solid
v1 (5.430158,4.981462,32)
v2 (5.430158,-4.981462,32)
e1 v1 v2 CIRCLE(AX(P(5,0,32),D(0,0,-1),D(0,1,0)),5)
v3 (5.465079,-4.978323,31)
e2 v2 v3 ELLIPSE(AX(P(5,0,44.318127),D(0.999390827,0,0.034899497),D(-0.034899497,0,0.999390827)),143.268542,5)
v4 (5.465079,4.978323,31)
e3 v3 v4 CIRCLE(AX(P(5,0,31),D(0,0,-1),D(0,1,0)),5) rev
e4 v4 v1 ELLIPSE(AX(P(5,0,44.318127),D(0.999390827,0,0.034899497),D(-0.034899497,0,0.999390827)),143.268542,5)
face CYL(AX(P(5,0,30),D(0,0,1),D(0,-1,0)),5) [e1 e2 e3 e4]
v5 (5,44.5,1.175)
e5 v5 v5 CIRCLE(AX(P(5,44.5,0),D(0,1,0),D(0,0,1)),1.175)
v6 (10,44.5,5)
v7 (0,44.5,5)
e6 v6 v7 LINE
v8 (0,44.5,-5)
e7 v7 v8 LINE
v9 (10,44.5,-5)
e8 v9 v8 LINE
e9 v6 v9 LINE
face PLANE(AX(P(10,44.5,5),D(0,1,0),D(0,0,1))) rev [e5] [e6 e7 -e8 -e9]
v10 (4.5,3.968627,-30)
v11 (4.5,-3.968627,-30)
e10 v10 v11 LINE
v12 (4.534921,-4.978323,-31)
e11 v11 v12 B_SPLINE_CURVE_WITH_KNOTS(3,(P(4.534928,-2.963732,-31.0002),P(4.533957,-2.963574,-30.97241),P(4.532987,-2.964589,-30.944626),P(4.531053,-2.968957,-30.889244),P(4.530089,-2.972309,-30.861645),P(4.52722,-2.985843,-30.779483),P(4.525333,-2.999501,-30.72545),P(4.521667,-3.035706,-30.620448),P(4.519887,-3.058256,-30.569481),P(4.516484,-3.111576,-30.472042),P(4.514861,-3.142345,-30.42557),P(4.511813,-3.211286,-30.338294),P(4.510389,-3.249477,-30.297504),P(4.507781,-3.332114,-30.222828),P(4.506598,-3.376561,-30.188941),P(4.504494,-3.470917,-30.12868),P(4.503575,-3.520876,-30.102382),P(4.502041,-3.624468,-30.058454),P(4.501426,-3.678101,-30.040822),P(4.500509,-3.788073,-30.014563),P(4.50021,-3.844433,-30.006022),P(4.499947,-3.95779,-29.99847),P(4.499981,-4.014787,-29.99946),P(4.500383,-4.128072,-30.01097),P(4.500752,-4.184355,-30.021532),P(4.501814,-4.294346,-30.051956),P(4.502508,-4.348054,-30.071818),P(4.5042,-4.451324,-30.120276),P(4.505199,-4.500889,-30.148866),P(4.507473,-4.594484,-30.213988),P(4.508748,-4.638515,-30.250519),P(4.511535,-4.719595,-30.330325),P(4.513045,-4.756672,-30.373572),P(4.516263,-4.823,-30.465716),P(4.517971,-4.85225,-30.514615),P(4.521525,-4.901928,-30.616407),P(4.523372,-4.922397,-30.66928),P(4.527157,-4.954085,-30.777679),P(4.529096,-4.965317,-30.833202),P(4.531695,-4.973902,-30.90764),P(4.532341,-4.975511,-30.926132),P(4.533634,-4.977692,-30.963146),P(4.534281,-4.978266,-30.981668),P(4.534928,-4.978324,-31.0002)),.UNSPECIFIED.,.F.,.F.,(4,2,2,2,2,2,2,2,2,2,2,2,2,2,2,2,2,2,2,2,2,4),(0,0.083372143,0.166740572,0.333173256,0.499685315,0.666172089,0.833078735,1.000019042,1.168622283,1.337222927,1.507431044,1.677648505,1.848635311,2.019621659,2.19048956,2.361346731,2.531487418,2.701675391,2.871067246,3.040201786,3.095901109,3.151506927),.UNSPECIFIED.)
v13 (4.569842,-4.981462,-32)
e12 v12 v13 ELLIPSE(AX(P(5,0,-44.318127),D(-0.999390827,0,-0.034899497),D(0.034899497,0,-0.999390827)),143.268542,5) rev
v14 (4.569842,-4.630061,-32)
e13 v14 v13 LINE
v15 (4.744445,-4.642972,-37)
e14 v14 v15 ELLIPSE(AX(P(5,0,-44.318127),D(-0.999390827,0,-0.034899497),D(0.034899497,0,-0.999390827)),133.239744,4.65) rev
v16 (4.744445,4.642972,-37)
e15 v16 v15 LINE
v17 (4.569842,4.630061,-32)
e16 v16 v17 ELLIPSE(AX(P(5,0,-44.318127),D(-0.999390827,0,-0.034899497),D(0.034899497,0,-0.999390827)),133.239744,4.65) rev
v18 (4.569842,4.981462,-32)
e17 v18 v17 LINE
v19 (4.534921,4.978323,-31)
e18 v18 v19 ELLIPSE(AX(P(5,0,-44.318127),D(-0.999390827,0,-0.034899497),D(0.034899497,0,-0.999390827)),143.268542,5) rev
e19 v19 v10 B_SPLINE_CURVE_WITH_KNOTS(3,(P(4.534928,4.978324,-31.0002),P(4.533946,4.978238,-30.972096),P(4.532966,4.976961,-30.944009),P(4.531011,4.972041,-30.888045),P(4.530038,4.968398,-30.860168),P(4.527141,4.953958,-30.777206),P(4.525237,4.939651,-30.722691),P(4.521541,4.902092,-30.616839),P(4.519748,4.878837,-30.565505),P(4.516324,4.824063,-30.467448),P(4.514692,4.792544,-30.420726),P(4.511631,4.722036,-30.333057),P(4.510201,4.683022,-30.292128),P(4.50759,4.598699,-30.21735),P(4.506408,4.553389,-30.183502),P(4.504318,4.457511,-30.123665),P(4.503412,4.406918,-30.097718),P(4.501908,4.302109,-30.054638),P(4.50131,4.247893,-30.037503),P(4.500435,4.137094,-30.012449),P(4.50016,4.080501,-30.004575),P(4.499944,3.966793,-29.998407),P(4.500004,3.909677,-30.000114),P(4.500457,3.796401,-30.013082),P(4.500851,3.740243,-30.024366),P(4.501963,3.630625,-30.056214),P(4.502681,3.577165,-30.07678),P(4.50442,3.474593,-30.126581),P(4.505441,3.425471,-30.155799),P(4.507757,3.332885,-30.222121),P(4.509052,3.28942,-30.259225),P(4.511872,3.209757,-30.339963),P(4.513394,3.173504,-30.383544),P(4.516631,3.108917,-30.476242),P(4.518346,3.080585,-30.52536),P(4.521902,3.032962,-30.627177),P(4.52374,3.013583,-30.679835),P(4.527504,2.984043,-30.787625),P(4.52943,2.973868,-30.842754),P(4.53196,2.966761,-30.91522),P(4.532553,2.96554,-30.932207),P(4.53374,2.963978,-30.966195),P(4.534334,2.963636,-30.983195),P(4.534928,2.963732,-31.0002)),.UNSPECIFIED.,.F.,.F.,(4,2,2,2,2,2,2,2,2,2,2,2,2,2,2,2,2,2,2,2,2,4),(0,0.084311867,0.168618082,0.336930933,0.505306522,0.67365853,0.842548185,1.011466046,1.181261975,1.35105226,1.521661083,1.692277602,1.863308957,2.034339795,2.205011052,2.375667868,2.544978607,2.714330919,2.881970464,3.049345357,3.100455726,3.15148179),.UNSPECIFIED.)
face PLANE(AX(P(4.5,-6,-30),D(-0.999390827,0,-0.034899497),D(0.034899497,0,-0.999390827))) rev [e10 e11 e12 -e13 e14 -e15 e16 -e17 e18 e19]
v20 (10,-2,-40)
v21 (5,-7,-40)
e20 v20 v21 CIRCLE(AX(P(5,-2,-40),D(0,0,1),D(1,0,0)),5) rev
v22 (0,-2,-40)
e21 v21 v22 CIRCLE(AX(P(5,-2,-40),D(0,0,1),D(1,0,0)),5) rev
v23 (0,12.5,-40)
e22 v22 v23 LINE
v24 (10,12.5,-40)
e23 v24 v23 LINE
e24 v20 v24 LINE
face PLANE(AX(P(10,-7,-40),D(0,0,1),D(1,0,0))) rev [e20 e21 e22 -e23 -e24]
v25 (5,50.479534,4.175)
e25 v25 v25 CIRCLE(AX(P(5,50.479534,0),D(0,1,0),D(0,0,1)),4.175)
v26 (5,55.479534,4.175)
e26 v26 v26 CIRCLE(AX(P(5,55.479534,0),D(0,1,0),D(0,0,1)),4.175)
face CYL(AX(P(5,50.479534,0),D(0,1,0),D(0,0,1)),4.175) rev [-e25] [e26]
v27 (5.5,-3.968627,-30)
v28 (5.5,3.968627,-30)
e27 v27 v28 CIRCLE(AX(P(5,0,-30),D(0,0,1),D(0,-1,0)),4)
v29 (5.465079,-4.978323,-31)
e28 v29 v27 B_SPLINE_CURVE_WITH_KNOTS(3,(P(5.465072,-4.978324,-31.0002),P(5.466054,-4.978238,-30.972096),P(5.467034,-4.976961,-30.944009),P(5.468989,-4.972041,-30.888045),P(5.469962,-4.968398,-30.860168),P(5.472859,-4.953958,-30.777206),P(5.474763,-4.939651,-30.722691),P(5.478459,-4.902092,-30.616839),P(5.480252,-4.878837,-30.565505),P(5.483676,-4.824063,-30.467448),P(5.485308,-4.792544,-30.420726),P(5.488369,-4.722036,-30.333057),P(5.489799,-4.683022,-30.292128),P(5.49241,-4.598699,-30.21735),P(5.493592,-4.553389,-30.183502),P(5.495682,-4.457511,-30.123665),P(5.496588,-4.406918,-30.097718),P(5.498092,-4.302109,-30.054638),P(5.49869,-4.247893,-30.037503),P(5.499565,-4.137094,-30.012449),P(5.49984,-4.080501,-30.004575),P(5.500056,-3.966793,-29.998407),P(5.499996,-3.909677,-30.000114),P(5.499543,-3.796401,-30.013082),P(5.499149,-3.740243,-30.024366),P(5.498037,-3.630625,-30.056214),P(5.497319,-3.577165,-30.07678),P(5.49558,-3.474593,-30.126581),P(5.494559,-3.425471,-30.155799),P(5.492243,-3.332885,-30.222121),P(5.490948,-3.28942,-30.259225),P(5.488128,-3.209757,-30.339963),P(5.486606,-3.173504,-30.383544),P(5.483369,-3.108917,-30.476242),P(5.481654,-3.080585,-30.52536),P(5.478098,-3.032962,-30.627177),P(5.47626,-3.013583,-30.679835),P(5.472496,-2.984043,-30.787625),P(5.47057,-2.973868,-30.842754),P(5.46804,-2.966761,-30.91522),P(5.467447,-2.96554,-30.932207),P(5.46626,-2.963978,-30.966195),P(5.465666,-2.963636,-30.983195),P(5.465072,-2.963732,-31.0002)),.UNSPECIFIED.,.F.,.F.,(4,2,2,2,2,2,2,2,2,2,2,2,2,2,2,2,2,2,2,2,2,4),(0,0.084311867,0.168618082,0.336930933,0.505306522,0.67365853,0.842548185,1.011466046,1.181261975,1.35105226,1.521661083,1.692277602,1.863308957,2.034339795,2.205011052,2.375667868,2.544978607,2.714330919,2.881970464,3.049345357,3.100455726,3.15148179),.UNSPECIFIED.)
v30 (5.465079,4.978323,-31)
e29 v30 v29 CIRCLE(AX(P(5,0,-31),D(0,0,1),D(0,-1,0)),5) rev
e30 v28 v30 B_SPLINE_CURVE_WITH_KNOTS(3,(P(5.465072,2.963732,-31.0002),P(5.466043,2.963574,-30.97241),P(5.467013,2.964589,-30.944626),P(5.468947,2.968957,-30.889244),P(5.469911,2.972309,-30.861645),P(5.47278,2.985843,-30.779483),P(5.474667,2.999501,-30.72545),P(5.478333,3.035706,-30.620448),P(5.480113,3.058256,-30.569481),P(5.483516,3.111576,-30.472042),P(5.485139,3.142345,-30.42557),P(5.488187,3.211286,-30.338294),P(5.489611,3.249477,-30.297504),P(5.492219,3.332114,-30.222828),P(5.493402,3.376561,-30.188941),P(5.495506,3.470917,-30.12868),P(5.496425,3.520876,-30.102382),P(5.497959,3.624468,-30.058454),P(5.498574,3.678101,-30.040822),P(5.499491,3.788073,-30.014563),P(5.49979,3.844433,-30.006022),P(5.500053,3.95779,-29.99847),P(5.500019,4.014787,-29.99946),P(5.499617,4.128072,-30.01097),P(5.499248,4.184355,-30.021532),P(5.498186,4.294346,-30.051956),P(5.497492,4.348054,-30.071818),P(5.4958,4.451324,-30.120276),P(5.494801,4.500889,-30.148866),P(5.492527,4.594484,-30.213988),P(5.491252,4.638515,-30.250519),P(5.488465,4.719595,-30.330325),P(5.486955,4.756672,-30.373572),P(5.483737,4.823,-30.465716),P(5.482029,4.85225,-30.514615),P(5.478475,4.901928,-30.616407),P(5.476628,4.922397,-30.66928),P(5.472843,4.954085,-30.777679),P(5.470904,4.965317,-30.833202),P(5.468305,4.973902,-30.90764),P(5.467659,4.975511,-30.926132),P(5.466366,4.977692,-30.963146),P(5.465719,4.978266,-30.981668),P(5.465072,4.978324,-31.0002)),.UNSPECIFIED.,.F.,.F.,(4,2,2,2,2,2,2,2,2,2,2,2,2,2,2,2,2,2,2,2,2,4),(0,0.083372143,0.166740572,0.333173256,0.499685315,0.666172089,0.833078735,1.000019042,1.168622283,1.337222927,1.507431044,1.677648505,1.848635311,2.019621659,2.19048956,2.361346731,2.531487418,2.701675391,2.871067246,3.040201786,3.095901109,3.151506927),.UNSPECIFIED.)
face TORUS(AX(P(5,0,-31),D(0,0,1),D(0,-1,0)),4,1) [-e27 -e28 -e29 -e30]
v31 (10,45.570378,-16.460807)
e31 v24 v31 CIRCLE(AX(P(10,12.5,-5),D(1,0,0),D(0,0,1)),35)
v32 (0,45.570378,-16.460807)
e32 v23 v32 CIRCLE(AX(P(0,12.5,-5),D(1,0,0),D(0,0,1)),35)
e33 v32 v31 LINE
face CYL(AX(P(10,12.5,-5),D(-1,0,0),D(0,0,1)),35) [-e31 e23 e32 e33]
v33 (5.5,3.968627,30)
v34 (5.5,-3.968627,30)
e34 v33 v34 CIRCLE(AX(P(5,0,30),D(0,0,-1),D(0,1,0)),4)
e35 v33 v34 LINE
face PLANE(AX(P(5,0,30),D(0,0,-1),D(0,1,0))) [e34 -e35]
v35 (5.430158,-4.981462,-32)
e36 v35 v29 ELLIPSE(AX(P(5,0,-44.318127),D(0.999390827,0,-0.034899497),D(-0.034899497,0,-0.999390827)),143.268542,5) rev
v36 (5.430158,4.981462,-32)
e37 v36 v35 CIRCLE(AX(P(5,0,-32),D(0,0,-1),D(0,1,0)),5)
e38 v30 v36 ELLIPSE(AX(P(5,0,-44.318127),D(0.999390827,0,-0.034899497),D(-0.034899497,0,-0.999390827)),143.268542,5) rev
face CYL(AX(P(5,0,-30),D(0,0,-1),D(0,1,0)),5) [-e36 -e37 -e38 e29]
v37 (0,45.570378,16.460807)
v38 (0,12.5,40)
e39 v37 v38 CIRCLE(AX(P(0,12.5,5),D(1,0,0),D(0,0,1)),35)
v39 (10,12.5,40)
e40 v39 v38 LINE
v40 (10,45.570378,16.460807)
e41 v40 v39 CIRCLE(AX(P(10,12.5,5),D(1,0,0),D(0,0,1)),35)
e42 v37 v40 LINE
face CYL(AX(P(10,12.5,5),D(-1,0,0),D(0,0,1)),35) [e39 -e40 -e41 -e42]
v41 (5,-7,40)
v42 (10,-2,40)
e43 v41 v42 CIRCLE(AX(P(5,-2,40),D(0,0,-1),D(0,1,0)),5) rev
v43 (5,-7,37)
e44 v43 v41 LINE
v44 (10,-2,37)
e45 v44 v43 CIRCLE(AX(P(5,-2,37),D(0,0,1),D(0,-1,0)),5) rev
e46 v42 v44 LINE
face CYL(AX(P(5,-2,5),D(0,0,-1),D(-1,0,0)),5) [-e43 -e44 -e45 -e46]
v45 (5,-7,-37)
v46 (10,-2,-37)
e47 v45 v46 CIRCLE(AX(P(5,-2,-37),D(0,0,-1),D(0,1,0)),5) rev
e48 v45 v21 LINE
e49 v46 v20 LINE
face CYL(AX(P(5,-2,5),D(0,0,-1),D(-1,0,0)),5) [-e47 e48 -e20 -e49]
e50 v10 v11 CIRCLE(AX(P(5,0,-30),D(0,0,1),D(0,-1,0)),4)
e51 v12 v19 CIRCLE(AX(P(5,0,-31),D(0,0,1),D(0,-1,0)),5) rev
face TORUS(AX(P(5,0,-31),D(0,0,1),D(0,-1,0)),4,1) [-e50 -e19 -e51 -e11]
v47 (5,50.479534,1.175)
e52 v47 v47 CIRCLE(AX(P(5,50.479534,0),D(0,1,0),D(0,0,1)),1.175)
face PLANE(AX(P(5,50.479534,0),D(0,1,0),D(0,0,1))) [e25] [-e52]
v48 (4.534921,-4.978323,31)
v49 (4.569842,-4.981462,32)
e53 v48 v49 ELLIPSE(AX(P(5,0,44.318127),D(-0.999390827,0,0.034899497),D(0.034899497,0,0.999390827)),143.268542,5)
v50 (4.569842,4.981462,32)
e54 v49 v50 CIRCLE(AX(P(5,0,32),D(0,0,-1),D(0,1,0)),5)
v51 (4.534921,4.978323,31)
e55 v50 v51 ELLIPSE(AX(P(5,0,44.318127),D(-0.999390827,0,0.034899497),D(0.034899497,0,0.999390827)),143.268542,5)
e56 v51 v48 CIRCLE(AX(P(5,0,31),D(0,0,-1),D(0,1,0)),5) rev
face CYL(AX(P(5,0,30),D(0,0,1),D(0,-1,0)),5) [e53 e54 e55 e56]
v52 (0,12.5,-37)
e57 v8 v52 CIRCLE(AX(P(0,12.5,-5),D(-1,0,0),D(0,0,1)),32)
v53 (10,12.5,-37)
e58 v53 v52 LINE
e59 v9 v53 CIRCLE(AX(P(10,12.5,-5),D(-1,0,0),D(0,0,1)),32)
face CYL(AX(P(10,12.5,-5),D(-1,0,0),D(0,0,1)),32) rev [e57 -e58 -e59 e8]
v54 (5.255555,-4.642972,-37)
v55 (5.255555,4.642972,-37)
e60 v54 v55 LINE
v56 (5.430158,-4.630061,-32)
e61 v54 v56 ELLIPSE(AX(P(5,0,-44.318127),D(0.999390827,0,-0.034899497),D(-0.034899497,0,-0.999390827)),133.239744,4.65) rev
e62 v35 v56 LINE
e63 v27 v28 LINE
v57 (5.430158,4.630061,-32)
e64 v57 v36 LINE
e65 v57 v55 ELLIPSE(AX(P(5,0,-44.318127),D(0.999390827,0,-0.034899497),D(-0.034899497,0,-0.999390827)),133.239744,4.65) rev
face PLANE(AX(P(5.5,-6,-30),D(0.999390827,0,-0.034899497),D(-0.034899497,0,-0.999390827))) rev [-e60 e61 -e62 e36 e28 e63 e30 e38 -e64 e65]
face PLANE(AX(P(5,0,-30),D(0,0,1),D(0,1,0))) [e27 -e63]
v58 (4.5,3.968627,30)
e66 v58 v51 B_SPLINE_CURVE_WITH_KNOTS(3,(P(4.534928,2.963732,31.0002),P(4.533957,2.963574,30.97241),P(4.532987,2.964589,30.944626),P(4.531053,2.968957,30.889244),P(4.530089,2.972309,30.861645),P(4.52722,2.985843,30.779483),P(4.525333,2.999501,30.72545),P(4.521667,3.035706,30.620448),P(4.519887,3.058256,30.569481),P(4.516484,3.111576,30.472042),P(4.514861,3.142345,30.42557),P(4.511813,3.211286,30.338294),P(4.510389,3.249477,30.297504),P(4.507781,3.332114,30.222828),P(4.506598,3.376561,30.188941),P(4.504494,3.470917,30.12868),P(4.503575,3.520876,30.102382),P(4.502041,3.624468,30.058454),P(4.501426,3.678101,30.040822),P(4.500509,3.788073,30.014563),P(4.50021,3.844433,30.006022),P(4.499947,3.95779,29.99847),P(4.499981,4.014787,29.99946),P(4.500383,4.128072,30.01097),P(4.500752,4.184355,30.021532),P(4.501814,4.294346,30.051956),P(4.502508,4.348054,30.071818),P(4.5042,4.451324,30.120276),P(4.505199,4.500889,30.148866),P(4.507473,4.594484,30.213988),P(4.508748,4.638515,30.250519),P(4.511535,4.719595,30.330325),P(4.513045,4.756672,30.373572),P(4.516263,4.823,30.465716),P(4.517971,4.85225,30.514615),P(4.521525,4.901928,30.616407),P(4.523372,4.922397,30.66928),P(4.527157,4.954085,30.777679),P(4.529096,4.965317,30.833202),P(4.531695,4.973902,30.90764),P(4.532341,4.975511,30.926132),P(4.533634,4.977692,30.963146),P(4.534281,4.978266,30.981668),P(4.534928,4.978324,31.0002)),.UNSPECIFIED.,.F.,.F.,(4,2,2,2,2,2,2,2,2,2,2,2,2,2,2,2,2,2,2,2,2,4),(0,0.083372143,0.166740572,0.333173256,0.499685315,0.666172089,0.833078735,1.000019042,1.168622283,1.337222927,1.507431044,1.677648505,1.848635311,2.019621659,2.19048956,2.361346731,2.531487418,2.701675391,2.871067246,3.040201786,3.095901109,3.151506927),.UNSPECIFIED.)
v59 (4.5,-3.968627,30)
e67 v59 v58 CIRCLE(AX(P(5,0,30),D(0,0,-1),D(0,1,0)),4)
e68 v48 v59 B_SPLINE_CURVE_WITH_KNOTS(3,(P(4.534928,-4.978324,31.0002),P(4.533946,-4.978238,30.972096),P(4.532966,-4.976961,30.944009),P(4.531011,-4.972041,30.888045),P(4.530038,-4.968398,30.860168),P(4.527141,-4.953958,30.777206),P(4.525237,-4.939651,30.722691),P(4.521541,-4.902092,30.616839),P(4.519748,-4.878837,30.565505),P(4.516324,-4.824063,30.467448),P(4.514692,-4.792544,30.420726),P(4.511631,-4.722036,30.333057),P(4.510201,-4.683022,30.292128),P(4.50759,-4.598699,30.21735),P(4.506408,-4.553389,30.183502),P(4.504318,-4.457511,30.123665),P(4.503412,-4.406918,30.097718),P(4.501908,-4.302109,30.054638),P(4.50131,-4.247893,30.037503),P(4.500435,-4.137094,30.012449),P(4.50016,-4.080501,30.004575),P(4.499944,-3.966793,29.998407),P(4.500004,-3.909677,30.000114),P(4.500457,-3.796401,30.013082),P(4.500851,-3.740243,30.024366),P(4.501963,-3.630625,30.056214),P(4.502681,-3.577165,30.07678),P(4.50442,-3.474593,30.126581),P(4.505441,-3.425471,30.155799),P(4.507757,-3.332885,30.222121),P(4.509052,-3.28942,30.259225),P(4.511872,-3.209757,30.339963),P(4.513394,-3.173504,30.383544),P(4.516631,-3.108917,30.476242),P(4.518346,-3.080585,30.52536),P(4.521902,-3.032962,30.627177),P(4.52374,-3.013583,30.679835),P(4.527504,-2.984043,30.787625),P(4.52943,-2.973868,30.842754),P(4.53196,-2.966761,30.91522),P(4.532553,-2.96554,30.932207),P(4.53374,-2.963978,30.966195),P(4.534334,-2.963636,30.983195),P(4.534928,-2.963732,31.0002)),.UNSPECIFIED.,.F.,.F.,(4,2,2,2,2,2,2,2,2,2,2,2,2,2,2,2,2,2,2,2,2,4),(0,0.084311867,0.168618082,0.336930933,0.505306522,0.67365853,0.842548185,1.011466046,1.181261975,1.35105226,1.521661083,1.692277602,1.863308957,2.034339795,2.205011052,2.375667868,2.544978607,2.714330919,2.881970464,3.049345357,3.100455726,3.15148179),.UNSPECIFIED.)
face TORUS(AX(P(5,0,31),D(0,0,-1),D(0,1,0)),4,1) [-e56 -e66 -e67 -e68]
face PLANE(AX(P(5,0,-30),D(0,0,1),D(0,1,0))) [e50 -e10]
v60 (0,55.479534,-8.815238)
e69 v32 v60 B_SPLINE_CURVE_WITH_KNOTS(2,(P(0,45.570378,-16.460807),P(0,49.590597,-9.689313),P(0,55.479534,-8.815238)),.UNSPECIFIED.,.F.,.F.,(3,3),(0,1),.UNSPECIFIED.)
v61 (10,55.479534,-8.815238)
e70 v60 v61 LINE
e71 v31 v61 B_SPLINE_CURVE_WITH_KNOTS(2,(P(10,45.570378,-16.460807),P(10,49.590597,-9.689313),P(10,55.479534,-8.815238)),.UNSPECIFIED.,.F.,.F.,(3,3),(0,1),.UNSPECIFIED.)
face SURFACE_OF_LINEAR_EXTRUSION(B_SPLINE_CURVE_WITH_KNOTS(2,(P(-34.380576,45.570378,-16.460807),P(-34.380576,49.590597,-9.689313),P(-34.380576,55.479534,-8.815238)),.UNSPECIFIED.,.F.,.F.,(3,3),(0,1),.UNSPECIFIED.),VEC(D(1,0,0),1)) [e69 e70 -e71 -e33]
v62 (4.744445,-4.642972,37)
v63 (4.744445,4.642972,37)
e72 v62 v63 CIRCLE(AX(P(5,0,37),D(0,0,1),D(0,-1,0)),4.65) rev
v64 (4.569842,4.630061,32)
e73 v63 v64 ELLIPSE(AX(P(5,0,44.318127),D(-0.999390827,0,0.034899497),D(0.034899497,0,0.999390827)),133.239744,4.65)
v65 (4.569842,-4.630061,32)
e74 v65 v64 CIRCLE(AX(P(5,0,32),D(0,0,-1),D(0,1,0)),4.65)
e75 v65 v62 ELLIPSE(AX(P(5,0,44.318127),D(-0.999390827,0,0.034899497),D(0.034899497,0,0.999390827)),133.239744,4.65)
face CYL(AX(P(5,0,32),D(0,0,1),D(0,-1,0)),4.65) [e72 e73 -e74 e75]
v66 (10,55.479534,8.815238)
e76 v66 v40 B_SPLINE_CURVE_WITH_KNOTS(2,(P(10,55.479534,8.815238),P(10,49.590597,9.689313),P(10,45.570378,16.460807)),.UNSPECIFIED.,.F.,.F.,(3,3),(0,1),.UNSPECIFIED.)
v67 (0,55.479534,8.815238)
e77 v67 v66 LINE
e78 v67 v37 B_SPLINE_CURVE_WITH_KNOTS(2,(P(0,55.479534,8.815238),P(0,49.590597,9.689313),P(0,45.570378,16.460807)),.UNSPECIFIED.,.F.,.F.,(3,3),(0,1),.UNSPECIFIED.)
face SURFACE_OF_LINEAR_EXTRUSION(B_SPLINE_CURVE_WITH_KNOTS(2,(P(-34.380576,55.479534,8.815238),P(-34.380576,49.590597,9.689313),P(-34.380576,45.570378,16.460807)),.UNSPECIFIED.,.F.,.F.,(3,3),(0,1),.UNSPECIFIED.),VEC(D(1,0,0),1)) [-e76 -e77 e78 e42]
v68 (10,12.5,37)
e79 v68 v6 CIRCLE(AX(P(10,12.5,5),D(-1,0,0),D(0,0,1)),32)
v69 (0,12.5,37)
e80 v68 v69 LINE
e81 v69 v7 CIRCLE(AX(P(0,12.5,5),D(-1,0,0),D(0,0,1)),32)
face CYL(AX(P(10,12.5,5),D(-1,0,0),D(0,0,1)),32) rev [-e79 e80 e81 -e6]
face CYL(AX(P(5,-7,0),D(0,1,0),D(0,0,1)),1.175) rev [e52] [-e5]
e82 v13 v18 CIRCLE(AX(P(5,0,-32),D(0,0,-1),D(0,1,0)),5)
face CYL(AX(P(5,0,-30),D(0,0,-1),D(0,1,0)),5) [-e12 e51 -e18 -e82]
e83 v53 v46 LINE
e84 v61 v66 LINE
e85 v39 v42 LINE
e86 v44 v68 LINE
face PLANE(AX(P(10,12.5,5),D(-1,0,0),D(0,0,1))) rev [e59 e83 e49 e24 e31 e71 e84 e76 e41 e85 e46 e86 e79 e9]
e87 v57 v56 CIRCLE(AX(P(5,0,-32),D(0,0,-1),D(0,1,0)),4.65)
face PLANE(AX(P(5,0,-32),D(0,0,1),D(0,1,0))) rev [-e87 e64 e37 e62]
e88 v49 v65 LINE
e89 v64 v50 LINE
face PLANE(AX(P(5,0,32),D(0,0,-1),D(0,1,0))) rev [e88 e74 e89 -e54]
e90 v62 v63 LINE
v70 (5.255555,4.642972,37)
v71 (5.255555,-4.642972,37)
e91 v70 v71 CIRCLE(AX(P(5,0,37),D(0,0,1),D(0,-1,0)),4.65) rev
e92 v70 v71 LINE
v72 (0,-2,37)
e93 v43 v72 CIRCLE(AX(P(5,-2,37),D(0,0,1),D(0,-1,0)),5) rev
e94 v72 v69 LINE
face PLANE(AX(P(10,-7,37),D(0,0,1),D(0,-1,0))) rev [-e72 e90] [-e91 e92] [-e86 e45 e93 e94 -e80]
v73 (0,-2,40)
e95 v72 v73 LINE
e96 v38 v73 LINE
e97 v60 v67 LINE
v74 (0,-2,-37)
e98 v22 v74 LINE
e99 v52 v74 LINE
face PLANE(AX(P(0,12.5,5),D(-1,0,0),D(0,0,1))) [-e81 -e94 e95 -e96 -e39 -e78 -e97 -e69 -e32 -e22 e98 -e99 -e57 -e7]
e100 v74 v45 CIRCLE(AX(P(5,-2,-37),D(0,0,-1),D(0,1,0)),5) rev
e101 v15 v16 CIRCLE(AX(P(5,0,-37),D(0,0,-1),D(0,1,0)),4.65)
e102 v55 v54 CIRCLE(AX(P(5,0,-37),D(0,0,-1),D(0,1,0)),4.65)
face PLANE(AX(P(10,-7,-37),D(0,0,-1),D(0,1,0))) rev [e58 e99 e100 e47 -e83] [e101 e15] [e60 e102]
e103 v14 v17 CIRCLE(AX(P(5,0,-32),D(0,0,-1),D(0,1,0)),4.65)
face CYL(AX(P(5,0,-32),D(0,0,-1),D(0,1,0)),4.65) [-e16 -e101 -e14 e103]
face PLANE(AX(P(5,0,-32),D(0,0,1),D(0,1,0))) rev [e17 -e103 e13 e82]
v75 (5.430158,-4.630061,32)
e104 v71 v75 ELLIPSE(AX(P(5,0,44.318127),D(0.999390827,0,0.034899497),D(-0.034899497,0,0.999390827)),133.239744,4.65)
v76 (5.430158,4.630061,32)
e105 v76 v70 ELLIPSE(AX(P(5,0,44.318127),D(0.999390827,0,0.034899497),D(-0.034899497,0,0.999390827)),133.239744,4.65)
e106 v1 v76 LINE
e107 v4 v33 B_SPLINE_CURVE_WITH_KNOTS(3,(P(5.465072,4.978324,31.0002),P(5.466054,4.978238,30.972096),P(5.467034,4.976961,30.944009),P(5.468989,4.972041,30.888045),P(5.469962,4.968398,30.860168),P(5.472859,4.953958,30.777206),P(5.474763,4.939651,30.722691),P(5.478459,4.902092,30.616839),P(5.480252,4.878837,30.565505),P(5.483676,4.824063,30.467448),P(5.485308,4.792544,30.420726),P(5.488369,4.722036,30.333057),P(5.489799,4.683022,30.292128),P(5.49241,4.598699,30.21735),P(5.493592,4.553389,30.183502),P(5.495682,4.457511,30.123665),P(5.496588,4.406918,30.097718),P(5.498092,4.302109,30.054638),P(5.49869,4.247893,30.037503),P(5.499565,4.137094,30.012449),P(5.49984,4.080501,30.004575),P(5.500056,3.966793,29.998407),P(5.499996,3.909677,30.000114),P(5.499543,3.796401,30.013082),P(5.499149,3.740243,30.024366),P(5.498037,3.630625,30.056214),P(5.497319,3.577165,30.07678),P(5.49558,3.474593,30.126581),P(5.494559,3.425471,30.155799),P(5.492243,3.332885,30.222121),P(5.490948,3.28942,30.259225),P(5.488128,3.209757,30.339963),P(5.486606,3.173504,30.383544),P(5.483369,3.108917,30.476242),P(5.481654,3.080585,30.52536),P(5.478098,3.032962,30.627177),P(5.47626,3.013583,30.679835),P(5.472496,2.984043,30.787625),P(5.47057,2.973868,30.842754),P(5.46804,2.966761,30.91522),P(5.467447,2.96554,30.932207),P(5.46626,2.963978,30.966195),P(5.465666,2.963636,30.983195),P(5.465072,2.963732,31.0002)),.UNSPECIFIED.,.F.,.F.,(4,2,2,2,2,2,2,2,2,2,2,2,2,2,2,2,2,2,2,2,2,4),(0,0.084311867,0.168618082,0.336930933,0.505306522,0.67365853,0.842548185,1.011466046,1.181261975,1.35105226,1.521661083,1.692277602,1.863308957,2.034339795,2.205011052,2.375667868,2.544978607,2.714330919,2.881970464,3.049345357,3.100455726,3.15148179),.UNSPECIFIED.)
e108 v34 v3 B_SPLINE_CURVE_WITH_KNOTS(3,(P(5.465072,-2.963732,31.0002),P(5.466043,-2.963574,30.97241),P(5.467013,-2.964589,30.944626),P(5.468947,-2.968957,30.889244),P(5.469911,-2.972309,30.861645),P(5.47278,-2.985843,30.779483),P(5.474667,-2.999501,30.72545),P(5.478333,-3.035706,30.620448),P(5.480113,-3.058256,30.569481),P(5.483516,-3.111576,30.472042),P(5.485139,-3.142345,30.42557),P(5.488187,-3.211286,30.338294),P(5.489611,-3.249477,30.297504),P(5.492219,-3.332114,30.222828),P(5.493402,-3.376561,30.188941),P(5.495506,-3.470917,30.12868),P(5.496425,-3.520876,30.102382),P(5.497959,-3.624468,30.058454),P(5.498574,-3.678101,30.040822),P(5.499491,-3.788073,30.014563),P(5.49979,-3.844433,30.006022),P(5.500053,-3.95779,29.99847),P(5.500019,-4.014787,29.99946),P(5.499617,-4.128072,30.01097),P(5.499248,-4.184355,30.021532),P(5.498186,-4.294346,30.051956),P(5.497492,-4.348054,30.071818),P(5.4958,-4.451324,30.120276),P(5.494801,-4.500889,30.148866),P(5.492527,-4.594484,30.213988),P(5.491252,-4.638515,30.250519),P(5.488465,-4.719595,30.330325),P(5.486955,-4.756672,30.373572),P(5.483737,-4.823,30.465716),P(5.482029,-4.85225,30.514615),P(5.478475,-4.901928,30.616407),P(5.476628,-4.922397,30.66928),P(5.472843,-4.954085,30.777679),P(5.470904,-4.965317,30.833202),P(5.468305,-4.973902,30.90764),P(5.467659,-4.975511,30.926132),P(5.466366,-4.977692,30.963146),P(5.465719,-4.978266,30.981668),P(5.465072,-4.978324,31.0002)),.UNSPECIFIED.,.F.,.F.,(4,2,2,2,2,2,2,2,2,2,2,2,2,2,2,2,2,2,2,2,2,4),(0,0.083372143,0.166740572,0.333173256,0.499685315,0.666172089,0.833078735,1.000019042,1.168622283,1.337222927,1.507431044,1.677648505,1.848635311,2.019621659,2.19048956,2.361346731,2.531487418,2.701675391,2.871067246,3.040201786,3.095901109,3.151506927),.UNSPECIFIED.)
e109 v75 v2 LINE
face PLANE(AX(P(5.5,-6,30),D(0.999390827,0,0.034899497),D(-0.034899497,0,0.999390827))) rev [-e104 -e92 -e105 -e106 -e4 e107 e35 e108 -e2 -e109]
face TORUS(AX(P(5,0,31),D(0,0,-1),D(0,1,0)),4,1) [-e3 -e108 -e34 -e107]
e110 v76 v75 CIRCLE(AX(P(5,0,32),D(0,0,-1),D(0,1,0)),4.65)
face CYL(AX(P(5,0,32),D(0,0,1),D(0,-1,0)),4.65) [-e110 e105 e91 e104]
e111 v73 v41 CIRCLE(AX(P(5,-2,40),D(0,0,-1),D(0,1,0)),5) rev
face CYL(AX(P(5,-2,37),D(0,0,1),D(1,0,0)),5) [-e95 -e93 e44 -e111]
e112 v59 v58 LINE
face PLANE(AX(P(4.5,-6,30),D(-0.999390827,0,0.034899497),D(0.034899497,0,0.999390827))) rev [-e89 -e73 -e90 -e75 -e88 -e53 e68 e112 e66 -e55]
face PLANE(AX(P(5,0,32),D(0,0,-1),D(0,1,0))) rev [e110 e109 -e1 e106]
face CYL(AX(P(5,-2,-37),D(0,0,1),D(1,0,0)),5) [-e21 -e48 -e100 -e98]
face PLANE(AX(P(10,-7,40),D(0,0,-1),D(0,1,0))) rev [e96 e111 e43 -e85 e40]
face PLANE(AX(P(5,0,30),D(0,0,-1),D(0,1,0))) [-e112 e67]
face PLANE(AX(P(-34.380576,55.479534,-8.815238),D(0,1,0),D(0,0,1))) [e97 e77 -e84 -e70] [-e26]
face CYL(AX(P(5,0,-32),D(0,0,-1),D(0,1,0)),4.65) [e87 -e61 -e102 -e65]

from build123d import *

# Parameters (mm, degrees)
BOSS_EXTRUDE1_DEPTH  = 10
FILLET1_R            = 5
SKETCH6_R            = 4.65
BOSS_EXTRUDE2_DEPTH  = 5
SKETCH7_R            = 5
BOSS_EXTRUDE3_DEPTH  = 2
FILLET2_R            = 1
FILLET2_OF_MIRROR1_R = 1
BOSS_EXTRUDE4_START  = -10
BOSS_EXTRUDE4_DEPTH  = 10
SKETCH9_R            = 4.175
CUT_EXTRUDE1_DEPTH   = 5
SKETCH10_R           = 1.175
CUT_EXTRUDE2_DEPTH   = 71.738227722
SKETCH12_W           = 1
SKETCH12_H           = 12
CUT_EXTRUDE3_DEPTH   = 7
CUT_EXTRUDE3_DRAFT   = -2
SKETCH13_W           = 1
SKETCH13_H           = 12
CUT_EXTRUDE4_DEPTH   = 7
CUT_EXTRUDE4_DRAFT   = -2


with BuildPart() as part:
    # Sketch3 → Boss-Extrude1 (new body)
    with BuildSketch(Plane(origin=(0, 0, 0), x_dir=(0, 0, -1), z_dir=(1, 0, 0))):
        with BuildLine():
            Line((-37, -7), (-37, 12.5))
            ThreePointArc((-37, 12.5), (-27.627416998, 35.127416998), (-5, 44.5))
            Line((-5, 44.5), (5, 44.5))
            ThreePointArc((5, 44.5), (27.627416998, 35.127416998), (37, 12.5))
            Line((37, 12.5), (37, -7))
            Line((37, -7), (40, -7))
            Line((40, -7), (40, 12.5))
            ThreePointArc((40, 12.5), (29.748737342, 37.248737342), (5, 47.5))
            Line((5, 47.5), (-5, 47.5))
            ThreePointArc((-5, 47.5), (-29.748737342, 37.248737342), (-40, 12.5))
            Line((-40, 12.5), (-40, -7))
            Line((-40, -7), (-37, -7))
        make_face()
    extrude(amount=BOSS_EXTRUDE1_DEPTH)

    # Fillet1
    fillet1_edges = [part.edges().sort_by_distance(p)[0] for p in [
        (10, -7, -38.5),
        (0, -7, -38.5),
        (0, -7, 38.5),
        (10, -7, 38.5),
    ]]
    fillet(fillet1_edges, radius=FILLET1_R - 0.0001)  # a hair under: the kernel refuses the full size

    # Sketch6 → Boss-Extrude2 (add)
    with BuildSketch(Plane(origin=(0, 0, 37), x_dir=(-1, 0, 0), z_dir=(0, 0, -1))):
        with Locations(Location((-5, 0, 0), (0, 0, 270))):
            Circle(SKETCH6_R)
    boss_extrude2 = extrude(amount=BOSS_EXTRUDE2_DEPTH)

    # Sketch7 → Boss-Extrude3 (add)
    with BuildSketch(Plane(origin=(0, 0, 32), x_dir=(-1, 0, 0), z_dir=(0, 0, -1))):
        with Locations(Location((-5, 0, 0), (0, 0, 90))):
            Circle(SKETCH7_R)
    boss_extrude3 = extrude(amount=BOSS_EXTRUDE3_DEPTH)

    # Fillet2
    fillet2_edges = [part.edges().sort_by_distance(p)[0] for p in [
        (5, -5, 30),
    ]]
    fillet(fillet2_edges, radius=FILLET2_R)

    # Mirror1: Boss-Extrude2, Boss-Extrude3 across plane
    add(boss_extrude2.mirror(Plane.XY))
    add(boss_extrude3.mirror(Plane.XY))

    # Fillet2 of Mirror1
    fillet2_of_mirror1_edges = [part.edges().sort_by_distance(p)[0] for p in [
        (5, -5, -30),
    ]]
    fillet(fillet2_of_mirror1_edges, radius=FILLET2_OF_MIRROR1_R)

    # Sketch8 → Boss-Extrude4 (add)
    with BuildSketch(Plane(origin=(10, 0, 0), x_dir=(0, 0, -1), z_dir=(1, 0, 0)).offset(BOSS_EXTRUDE4_START)):
        with BuildLine():
            Line((8.815238473, 55.479534195), (-8.815238473, 55.479534195))
            add(Edge.make_bspline(
                [(-16.460806571, 45.570378177), (-9.68931269, 49.59059719), (-8.815238473, 55.479534195)],
                knots=[0, 0, 0, 1, 1, 1], degree=2))
            ThreePointArc((-16.460806571, 45.570378177), (-10.811056867, 47.014223417), (-5, 47.5))
            Line((-5, 47.5), (5, 47.5))
            ThreePointArc((5, 47.5), (10.811056867, 47.014223417), (16.460806571, 45.570378177))
            add(Edge.make_bspline(
                [(16.460806571, 45.570378177), (9.68931269, 49.59059719), (8.815238473, 55.479534195)],
                knots=[0, 0, 0, 1, 1, 1], degree=2))
        make_face()
    extrude(amount=BOSS_EXTRUDE4_DEPTH)

    # Sketch9 → Cut-Extrude1 (cut)
    with BuildSketch(Plane(origin=(0, 55.479534195, 0), x_dir=(1, 0, 0), z_dir=(0, 1, 0))):
        with Locations(Location((5, 0, 0), (0, 0, 270))):
            Circle(SKETCH9_R)
    extrude(amount=-CUT_EXTRUDE1_DEPTH, mode=Mode.SUBTRACT)

    # Sketch10 → Cut-Extrude2 (cut, through all)
    with BuildSketch(Plane(origin=(0, 50.479534195, 0), x_dir=(1, 0, 0), z_dir=(0, 1, 0))):
        with Locations(Location((5, 0, 0), (0, 0, 270))):
            Circle(SKETCH10_R)
    extrude(amount=-CUT_EXTRUDE2_DEPTH, mode=Mode.SUBTRACT)


with BuildPart() as cut_extrude3_tool:
    # Sketch12 → Cut-Extrude3 (with draft: the straight prism first)
    with BuildSketch(Plane(origin=(0, 0, 30), x_dir=(-1, 0, 0), z_dir=(0, 0, -1))):
        with Locations((-5, 0)):
            Rectangle(SKETCH12_W, SKETCH12_H)
    extrude(amount=-CUT_EXTRUDE3_DEPTH)
    # Cut-Extrude3: the draft: its side faces are tilted about the plane it starts from
    cut_extrude3_sides = [cut_extrude3_tool.faces().sort_by_distance(p)[0] for p in [
        (4.5, 0, 33.5),
        (5, 6, 33.5),
        (5.5, 0, 33.5),
        (5, -6, 33.5),
    ]]
    draft(cut_extrude3_sides, Plane(origin=(0, 0, 30), x_dir=(-1, 0, 0), z_dir=(0, 0, -1)), CUT_EXTRUDE3_DRAFT)


with BuildPart() as part_1:
    add(part.part)

    # Cut-Extrude3: cut by cut_extrude3_tool
    add(cut_extrude3_tool.part, mode=Mode.SUBTRACT)


with BuildPart() as cut_extrude4_tool:
    # Sketch13 → Cut-Extrude4 (with draft: the straight prism first)
    with BuildSketch(Plane.XY.offset(-30)):
        with Locations((5, 0)):
            Rectangle(SKETCH13_W, SKETCH13_H)
    extrude(amount=-CUT_EXTRUDE4_DEPTH)
    # Cut-Extrude4: the draft: its side faces are tilted about the plane it starts from
    cut_extrude4_sides = [cut_extrude4_tool.faces().sort_by_distance(p)[0] for p in [
        (5, -6, -33.5),
        (5.5, 0, -33.5),
        (5, 6, -33.5),
        (4.5, 0, -33.5),
    ]]
    draft(cut_extrude4_sides, Plane.XY.offset(-30), CUT_EXTRUDE4_DRAFT)


with BuildPart() as part_2:
    add(part_1.part)

    # Cut-Extrude4: cut by cut_extrude4_tool
    add(cut_extrude4_tool.part, mode=Mode.SUBTRACT)


solid = part_2.part
